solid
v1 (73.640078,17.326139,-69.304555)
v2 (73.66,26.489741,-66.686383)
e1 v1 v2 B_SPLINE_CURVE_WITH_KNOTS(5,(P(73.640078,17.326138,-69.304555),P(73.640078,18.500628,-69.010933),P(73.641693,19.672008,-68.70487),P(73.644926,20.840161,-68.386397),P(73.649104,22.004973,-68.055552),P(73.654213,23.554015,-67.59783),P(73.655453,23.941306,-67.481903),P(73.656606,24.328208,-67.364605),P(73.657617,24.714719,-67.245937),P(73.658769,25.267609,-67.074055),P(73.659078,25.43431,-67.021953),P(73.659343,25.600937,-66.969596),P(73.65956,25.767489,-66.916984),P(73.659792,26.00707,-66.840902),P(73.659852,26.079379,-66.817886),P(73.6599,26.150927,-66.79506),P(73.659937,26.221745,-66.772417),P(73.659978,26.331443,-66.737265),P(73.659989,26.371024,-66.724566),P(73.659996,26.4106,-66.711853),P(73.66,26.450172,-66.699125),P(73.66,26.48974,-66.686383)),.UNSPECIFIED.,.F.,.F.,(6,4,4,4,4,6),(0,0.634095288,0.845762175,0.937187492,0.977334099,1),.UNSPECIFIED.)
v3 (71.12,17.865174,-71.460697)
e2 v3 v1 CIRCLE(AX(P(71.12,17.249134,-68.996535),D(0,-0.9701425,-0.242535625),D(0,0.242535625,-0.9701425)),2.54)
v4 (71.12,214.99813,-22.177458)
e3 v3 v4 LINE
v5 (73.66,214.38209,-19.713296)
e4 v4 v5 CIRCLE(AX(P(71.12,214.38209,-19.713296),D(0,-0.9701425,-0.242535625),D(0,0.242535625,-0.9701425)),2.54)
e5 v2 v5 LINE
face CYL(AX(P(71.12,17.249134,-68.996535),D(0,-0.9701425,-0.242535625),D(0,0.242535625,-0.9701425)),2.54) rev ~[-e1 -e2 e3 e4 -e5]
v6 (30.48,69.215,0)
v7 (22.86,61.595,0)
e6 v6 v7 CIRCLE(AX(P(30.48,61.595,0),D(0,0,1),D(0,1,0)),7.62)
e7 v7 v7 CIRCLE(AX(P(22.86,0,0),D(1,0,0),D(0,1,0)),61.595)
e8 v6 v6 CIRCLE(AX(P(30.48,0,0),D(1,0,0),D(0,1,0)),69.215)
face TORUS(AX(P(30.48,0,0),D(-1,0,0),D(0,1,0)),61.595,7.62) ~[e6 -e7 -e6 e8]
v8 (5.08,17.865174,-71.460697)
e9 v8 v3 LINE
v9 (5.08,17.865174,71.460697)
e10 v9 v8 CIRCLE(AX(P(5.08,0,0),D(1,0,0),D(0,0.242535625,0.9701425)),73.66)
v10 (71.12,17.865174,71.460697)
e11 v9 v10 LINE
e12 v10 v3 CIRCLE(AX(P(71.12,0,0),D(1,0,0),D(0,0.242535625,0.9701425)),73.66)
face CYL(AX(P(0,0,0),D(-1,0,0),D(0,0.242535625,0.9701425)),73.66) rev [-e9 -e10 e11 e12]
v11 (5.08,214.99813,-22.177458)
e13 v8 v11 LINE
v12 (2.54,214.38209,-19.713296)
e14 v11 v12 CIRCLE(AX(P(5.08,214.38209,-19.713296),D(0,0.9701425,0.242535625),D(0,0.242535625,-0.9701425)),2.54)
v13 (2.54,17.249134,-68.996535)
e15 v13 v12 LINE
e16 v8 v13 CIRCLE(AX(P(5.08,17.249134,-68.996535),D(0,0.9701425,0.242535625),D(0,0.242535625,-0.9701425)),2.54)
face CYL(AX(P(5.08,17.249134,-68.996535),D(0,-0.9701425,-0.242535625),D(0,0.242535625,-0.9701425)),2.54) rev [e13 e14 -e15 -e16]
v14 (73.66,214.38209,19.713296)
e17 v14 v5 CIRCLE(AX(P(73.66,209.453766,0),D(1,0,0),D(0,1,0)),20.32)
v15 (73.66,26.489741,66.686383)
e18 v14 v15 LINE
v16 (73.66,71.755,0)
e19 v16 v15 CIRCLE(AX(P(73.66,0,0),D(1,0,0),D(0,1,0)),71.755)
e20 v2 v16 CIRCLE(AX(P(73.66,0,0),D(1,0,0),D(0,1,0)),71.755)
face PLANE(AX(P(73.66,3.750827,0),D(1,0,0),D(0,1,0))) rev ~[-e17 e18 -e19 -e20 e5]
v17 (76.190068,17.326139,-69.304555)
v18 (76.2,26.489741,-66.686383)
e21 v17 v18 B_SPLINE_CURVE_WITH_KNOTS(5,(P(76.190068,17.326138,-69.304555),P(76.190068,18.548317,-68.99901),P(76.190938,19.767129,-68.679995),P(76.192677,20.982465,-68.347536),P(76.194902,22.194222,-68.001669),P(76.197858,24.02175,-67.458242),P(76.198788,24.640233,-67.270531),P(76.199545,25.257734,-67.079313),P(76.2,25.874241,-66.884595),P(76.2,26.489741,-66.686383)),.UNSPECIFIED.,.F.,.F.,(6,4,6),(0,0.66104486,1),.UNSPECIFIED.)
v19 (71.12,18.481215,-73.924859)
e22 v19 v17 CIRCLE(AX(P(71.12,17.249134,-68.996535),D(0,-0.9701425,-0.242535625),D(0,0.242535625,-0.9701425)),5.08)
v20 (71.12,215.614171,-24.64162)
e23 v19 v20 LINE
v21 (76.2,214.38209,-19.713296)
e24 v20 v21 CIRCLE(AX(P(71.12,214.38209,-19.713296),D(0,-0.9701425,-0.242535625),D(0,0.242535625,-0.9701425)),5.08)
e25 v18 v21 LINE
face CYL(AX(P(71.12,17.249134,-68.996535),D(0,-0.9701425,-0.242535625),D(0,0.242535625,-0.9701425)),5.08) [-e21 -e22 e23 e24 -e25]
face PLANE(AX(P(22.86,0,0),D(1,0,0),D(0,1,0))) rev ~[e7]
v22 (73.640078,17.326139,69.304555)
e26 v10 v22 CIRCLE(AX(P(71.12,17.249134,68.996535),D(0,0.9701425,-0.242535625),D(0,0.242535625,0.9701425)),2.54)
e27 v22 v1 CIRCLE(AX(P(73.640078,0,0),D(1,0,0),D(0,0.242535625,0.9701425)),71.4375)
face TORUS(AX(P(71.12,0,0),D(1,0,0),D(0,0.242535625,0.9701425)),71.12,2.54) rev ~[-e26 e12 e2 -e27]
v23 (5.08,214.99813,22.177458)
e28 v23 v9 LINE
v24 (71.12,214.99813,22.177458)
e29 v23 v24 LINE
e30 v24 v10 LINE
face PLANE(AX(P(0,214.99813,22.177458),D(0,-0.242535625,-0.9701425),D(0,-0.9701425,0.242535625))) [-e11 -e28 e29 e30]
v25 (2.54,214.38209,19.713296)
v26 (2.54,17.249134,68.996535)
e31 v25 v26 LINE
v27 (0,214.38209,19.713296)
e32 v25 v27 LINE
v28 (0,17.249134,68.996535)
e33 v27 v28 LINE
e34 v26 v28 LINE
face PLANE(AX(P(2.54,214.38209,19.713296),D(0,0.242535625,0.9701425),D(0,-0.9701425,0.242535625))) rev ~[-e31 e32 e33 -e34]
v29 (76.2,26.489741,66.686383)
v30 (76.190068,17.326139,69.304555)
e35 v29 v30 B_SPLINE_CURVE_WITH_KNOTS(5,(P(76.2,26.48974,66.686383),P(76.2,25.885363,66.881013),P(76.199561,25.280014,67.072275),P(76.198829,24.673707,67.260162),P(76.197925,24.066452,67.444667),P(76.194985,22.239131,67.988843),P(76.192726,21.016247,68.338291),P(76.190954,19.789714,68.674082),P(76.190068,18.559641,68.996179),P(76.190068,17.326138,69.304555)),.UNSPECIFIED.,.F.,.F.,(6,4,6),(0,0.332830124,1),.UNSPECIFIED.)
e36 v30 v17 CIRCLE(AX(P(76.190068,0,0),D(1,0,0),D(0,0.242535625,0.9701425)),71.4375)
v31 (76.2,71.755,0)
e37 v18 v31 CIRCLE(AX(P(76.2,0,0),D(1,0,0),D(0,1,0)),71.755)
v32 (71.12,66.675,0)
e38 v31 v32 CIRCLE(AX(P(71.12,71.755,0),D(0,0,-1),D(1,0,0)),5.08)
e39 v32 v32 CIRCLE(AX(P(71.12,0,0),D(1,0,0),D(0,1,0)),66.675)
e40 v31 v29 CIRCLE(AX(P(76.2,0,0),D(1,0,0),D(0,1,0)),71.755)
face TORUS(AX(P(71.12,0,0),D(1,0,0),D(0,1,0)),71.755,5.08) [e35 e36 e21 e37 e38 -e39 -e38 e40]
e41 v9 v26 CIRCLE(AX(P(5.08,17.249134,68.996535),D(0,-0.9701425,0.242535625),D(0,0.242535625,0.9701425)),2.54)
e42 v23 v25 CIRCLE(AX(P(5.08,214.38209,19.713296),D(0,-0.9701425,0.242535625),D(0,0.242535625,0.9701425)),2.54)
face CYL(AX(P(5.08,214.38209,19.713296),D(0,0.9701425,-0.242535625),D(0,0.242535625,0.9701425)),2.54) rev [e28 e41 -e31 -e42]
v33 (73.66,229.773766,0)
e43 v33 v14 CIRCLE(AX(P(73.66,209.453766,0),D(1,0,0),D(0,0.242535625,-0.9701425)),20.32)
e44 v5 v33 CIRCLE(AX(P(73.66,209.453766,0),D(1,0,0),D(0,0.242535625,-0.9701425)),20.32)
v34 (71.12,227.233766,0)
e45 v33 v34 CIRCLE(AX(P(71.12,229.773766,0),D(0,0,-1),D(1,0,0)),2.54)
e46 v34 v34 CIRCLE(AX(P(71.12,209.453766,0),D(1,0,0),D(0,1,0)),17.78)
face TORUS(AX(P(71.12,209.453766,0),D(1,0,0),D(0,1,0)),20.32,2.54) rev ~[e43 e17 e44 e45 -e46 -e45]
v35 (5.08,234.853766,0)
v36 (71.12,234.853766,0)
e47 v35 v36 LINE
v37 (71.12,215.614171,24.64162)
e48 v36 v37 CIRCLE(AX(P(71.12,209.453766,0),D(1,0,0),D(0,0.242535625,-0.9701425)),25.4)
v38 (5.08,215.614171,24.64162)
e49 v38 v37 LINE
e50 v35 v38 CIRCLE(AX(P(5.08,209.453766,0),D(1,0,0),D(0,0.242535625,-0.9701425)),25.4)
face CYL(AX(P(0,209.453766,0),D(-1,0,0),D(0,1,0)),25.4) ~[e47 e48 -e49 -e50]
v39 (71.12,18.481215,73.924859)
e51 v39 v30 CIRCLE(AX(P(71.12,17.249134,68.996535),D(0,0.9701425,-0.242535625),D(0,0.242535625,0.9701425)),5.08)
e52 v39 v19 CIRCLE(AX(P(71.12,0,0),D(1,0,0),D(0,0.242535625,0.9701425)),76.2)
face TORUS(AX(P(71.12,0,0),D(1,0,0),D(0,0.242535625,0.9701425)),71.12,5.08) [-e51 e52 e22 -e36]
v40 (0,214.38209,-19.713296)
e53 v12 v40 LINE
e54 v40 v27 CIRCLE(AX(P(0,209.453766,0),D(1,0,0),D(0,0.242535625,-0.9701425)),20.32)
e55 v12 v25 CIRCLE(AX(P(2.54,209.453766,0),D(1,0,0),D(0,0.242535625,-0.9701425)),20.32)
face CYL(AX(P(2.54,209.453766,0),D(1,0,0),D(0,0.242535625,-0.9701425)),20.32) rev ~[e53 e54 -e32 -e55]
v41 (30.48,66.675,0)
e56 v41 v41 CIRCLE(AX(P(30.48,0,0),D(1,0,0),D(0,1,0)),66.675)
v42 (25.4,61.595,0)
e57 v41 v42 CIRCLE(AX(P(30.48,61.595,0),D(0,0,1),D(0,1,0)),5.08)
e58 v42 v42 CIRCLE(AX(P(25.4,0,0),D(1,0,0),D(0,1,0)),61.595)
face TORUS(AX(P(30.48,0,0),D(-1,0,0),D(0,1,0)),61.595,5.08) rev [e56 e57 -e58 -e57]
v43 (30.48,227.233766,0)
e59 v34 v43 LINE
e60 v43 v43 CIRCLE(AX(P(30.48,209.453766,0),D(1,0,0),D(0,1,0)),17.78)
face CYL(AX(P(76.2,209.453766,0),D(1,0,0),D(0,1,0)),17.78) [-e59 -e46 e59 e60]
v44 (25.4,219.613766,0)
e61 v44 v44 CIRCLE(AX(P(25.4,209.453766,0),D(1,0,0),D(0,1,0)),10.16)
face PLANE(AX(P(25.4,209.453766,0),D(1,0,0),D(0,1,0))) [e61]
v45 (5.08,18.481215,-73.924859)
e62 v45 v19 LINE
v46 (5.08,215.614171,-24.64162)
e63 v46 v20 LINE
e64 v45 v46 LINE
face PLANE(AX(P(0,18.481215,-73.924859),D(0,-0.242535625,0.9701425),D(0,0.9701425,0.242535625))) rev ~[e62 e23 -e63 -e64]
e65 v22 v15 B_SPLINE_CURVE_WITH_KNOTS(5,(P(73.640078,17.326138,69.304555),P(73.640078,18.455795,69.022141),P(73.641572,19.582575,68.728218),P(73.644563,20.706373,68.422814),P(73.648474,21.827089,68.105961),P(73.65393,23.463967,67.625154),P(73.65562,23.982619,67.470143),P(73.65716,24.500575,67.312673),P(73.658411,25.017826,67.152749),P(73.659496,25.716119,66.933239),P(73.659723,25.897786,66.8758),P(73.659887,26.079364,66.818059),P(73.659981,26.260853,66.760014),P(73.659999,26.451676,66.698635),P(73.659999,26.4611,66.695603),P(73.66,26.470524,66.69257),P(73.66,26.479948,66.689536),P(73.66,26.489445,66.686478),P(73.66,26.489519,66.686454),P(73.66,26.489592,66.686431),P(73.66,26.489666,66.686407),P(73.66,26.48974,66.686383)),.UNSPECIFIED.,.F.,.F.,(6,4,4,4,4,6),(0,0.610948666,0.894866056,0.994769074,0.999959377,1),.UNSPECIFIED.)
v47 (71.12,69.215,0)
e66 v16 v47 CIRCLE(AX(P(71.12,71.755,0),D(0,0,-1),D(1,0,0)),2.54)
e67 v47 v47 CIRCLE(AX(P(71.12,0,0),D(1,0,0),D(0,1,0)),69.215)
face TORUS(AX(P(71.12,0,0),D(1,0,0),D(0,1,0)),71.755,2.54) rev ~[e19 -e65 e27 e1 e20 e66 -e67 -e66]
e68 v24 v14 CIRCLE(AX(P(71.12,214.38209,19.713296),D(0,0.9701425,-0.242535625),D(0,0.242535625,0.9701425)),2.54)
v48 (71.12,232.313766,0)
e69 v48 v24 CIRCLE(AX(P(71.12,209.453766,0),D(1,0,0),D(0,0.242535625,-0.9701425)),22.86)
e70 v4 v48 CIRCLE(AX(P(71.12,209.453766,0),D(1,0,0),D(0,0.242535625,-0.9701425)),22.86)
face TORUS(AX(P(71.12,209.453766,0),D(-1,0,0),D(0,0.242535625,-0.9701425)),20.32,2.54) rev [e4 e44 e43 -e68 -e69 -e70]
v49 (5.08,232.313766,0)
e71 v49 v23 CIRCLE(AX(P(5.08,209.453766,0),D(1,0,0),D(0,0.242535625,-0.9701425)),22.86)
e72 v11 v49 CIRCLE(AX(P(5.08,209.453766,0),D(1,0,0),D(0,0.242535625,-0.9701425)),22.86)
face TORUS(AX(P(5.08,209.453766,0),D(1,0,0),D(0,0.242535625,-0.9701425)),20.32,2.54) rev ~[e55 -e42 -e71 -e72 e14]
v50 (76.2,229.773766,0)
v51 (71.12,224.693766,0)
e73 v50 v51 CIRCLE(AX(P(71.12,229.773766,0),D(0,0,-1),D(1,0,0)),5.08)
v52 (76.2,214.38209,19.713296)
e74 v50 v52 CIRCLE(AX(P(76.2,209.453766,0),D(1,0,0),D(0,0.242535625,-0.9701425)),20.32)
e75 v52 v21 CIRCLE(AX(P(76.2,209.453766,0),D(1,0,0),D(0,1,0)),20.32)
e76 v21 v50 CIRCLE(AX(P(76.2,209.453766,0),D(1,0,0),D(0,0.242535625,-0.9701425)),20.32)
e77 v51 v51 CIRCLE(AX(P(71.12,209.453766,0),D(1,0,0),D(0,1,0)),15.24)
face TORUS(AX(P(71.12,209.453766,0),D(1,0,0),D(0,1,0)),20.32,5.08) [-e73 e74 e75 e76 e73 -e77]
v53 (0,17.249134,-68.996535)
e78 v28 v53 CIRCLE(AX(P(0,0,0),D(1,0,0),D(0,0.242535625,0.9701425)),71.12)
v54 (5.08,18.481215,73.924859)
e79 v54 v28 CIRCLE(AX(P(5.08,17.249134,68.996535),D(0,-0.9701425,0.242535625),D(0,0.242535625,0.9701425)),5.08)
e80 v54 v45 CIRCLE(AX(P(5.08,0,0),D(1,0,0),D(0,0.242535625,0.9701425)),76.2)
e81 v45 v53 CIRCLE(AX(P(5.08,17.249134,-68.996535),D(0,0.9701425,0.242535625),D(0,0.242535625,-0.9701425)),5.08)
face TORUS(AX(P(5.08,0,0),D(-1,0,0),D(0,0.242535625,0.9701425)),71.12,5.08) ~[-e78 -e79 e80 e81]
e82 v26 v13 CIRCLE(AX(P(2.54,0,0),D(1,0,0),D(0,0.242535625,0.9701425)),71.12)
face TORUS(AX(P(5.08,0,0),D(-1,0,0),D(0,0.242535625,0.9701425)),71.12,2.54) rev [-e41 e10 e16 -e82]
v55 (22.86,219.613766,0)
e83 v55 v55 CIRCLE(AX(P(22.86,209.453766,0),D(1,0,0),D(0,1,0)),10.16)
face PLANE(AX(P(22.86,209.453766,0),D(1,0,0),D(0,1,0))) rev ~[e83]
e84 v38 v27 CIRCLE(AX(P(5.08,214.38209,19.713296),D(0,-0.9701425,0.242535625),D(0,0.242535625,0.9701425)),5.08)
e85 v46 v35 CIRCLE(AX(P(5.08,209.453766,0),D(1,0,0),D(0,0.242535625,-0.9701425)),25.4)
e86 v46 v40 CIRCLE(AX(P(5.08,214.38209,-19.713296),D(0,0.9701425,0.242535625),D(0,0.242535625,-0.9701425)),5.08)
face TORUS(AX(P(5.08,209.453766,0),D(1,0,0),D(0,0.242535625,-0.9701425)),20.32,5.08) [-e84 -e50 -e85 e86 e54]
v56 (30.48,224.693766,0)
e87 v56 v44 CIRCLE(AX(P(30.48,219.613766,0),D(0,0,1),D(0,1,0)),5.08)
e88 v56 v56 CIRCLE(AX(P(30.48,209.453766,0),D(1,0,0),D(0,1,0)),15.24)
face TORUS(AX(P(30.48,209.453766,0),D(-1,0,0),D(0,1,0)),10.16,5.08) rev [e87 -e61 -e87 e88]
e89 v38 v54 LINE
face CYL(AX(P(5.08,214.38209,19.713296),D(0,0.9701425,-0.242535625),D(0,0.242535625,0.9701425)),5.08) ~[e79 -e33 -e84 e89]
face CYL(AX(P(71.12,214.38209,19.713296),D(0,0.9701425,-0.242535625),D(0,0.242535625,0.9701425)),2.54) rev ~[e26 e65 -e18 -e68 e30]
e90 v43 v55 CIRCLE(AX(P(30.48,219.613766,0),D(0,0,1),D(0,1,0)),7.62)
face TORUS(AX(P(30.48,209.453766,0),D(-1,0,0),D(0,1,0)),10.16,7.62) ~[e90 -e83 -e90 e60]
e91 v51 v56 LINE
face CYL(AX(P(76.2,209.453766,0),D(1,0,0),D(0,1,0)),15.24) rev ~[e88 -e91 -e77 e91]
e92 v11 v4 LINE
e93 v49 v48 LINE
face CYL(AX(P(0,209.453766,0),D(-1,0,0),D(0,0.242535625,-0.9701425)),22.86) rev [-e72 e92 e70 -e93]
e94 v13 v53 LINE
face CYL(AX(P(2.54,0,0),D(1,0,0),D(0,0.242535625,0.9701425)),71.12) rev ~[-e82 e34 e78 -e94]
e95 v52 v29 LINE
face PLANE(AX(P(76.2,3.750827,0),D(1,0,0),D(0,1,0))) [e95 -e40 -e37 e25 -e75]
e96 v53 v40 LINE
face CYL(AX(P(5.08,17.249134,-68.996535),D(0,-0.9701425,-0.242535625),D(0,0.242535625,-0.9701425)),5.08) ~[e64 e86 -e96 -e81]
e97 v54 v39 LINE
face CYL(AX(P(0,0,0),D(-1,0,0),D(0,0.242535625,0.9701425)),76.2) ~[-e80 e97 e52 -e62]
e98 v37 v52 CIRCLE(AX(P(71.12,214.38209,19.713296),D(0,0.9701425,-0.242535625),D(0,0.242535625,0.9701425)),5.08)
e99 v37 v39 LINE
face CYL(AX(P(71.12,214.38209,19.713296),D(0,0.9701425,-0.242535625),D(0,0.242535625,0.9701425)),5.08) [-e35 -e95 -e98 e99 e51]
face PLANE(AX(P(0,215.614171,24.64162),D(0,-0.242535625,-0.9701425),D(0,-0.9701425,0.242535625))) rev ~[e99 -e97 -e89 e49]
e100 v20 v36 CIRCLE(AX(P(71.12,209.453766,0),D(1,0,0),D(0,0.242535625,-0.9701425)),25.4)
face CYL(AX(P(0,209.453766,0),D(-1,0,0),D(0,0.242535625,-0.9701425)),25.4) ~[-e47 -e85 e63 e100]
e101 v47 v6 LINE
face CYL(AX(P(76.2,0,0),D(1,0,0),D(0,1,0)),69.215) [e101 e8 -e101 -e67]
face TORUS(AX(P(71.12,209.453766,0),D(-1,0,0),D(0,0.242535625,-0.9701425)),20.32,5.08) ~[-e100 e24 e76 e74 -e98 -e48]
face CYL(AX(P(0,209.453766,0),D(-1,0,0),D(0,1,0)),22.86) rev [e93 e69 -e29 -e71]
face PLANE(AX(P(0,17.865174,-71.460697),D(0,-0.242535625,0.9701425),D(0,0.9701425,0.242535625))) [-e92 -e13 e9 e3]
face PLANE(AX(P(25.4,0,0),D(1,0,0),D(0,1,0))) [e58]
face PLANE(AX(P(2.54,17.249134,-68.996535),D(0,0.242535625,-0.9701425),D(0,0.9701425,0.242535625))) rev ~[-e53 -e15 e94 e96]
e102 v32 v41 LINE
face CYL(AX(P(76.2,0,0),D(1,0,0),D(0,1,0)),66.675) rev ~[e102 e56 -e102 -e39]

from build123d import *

# Parameters (mm, degrees)
F1_DEPTH     = 76.2
F2_R         = 66.675
F2_R_2       = 15.24
F3_DEPTH     = 50.8
F4_T5_DEPTH  = 203.2
F4_T7_DEPTH  = 203.2
F4_T10_ANGLE = 208.0724869359
F4_T12_ANGLE = 151.9275130641
F4_T18_ANGLE = 208.0724869359
F4_T20_ANGLE = 151.9275130641
F5_T         = -2.54


# Not quite as in the source:
# - a fillet or chamfer that OpenCascade refuses, or shapes differently, is made with other operations: its cross-section is extruded or revolved along the edge and cut away or added
# - a shell that OpenCascade refuses in one call is made with other operations: the cavity is built on its own and cut out


with BuildPart() as f1:
    # F0 (on Right) → F1 (new body)
    with BuildSketch(Plane.YZ):
        with BuildLine():
            ThreePointArc((18.4812146278, -73.9248585111), (60.0612543768, -46.8944103565), (76.2, 0))
            ThreePointArc((76.2, 0), (60.0612543768, 46.8944103565), (18.4812146278, 73.9248585111))
            ThreePointArc((18.4812146278, 73.9248585111), (-76.2, 0), (18.4812146278, -73.9248585111))
        make_face()
        with BuildLine():
            ThreePointArc((18.4812146278, 73.9248585111), (60.0612543768, 46.8944103565), (76.2, 0))
            ThreePointArc((76.2, 0), (60.0612543768, -46.8944103565), (18.4812146278, -73.9248585111))
            Line((18.4812146278, -73.9248585111), (215.6141706573, -24.6416195037))
            ThreePointArc((215.6141706573, -24.6416195037), (184.0537657814, 0), (215.6141706573, 24.6416195037))
            Line((215.6141706573, 24.6416195037), (18.4812146278, 73.9248585111))
        make_face()
        with BuildLine():
            ThreePointArc((234.8537657814, 0), (229.474183907, 15.6314701188), (215.6141706573, 24.6416195037))
            ThreePointArc((215.6141706573, 24.6416195037), (184.0537657814, 0), (215.6141706573, -24.6416195037))
            ThreePointArc((215.6141706573, -24.6416195037), (229.474183907, -15.6314701188), (234.8537657814, 0))
        make_face()
    extrude(amount=F1_DEPTH)

    # F2 (on face) → F3 (cut)
    with BuildSketch(Plane.YZ.offset(76.2)):
        Circle(F2_R)
        with Locations((209.4537657814, 0)):
            Circle(F2_R_2)
    extrude(amount=-F3_DEPTH, mode=Mode.SUBTRACT)

    # F4: fillet of radius 5.08 on 12 edges, made by hand

    # F4_s1 → F4_t2 (revolve)
    with BuildSketch(Plane.XY):
        with BuildLine():
            ThreePointArc((30.48, 66.675), (26.8878975516, 65.1871024484), (25.4, 61.595))
            Line((25.4, 61.595), (25.4, 66.675))
            Line((25.4, 66.675), (30.48, 66.675))
        make_face()
    revolve(axis=Axis((25.4, 0, 0), (1, 0, 0)))

    # F4_s3 → F4_t4 (revolve)
    with BuildSketch(Plane.XY):
        with BuildLine():
            ThreePointArc((30.48, 224.6937657814), (26.8878975516, 223.2058682298), (25.4, 219.6137657814))
            Line((25.4, 219.6137657814), (25.4, 224.6937657814))
            Line((25.4, 224.6937657814), (30.48, 224.6937657814))
        make_face()
    revolve(axis=Axis((25.4, 209.4537657814, 0), (1, 0, 0)))

    # F4_s6 → F4_t5 (cut)
    with BuildSketch(Plane(origin=(0, 197.1329560295, -49.2832390074), x_dir=(1, 0, 0), z_dir=(0, -0.9701425001, 0.242535625))):
        with BuildLine():
            ThreePointArc((71.12, 76.2), (74.7121024484, 74.7121024484), (76.2, 71.12))
            Line((76.2, 71.12), (76.2, 76.2))
            Line((76.2, 76.2), (71.12, 76.2))
        make_face()
        with BuildLine():
            ThreePointArc((5.08, 76.2), (1.4878975516, 74.7121024484), (0, 71.12))
            Line((0, 71.12), (0, 76.2))
            Line((0, 76.2), (5.08, 76.2))
        make_face()
    extrude(amount=F4_T5_DEPTH, mode=Mode.SUBTRACT)

    # F4_s8 → F4_t7 (cut)
    with BuildSketch(Plane(origin=(0, 0, 0), x_dir=(1, 0, 0), z_dir=(0, 0.9701425001, 0.242535625))):
        with BuildLine():
            ThreePointArc((71.12, 76.2), (74.7121024484, 74.7121024484), (76.2, 71.12))
            Line((76.2, 71.12), (76.2, 76.2))
            Line((76.2, 76.2), (71.12, 76.2))
        make_face()
        with BuildLine():
            ThreePointArc((5.08, 76.2), (1.4878975516, 74.7121024484), (0, 71.12))
            Line((0, 71.12), (0, 76.2))
            Line((0, 76.2), (5.08, 76.2))
        make_face()
    extrude(amount=F4_T7_DEPTH, mode=Mode.SUBTRACT)

    # F4_s9 → F4_t10 (revolve, cut)
    with BuildSketch(Plane(origin=(0, 0, 0), x_dir=(1, 0, 0), z_dir=(0, 0.9701425001, -0.242535625))):
        with BuildLine():
            ThreePointArc((71.12, -76.2), (74.7121024484, -74.7121024484), (76.2, -71.12))
            Line((76.2, -71.12), (76.2, -76.2))
            Line((76.2, -76.2), (71.12, -76.2))
        make_face()
    revolve(axis=Axis((76.2, 0, 0), (1, 0, 0)), revolution_arc=F4_T10_ANGLE, mode=Mode.SUBTRACT)

    # F4_s11 → F4_t12 (revolve, cut)
    with BuildSketch(Plane(origin=(0, 197.1329560295, 49.2832390074), x_dir=(1, 0, 0), z_dir=(0, -0.9701425001, -0.242535625))):
        with BuildLine():
            ThreePointArc((76.2, -71.12), (74.7121024484, -74.7121024484), (71.12, -76.2))
            Line((71.12, -76.2), (76.2, -76.2))
            Line((76.2, -76.2), (76.2, -71.12))
        make_face()
    revolve(axis=Axis((76.2, 209.4537657814, 0), (1, 0, 0)), revolution_arc=F4_T12_ANGLE, mode=Mode.SUBTRACT)

    # F4_s13 → F4_t14 (revolve, cut)
    with BuildSketch(Plane.XY):
        with BuildLine():
            ThreePointArc((76.2, 71.755), (74.7121024484, 68.1628975516), (71.12, 66.675))
            Line((71.12, 66.675), (76.2, 66.675))
            Line((76.2, 66.675), (76.2, 71.755))
        make_face()
    revolve(axis=Axis((76.2, 0, 0), (1, 0, 0)), mode=Mode.SUBTRACT)

    # F4_s15 → F4_t16 (revolve, cut)
    with BuildSketch(Plane.XY):
        with BuildLine():
            ThreePointArc((76.2, 229.7737657814), (74.7121024484, 226.1816633329), (71.12, 224.6937657814))
            Line((71.12, 224.6937657814), (76.2, 224.6937657814))
            Line((76.2, 224.6937657814), (76.2, 229.7737657814))
        make_face()
    revolve(axis=Axis((76.2, 209.4537657814, 0), (1, 0, 0)), mode=Mode.SUBTRACT)

    # F4_s17 → F4_t18 (revolve, cut)
    with BuildSketch(Plane(origin=(0, 0, 0), x_dir=(1, 0, 0), z_dir=(0, 0.9701425001, -0.242535625))):
        with BuildLine():
            ThreePointArc((5.08, -76.2), (1.4878975516, -74.7121024484), (0, -71.12))
            Line((0, -71.12), (0, -76.2))
            Line((0, -76.2), (5.08, -76.2))
        make_face()
    revolve(axis=Axis((0, 0, 0), (1, 0, 0)), revolution_arc=F4_T18_ANGLE, mode=Mode.SUBTRACT)

    # F4_s19 → F4_t20 (revolve, cut)
    with BuildSketch(Plane(origin=(0, 197.1329560295, 49.2832390074), x_dir=(1, 0, 0), z_dir=(0, -0.9701425001, -0.242535625))):
        with BuildLine():
            ThreePointArc((0, -71.12), (1.4878975516, -74.7121024484), (5.08, -76.2))
            Line((5.08, -76.2), (0, -76.2))
            Line((0, -76.2), (0, -71.12))
        make_face()
    revolve(axis=Axis((0, 209.4537657814, 0), (1, 0, 0)), revolution_arc=F4_T20_ANGLE, mode=Mode.SUBTRACT)

    # F5: a shell. OpenCascade refuses it in one call, so the cavity is built on its own and cut out:
    # the body offset inwards by the wall thickness, plus a prism from it out through each open face.
    f5_core = offset(f1.part, amount=F5_T, mode=Mode.PRIVATE)
    f5_exits = [f5_core.faces().sort_by_distance(p)[0] for p in [
        (2.54, 56.038662, 0),
    ]]
    add(f5_core, mode=Mode.SUBTRACT)
    extrude(f5_exits, amount=-F5_T, mode=Mode.SUBTRACT)


solid = f1.part
